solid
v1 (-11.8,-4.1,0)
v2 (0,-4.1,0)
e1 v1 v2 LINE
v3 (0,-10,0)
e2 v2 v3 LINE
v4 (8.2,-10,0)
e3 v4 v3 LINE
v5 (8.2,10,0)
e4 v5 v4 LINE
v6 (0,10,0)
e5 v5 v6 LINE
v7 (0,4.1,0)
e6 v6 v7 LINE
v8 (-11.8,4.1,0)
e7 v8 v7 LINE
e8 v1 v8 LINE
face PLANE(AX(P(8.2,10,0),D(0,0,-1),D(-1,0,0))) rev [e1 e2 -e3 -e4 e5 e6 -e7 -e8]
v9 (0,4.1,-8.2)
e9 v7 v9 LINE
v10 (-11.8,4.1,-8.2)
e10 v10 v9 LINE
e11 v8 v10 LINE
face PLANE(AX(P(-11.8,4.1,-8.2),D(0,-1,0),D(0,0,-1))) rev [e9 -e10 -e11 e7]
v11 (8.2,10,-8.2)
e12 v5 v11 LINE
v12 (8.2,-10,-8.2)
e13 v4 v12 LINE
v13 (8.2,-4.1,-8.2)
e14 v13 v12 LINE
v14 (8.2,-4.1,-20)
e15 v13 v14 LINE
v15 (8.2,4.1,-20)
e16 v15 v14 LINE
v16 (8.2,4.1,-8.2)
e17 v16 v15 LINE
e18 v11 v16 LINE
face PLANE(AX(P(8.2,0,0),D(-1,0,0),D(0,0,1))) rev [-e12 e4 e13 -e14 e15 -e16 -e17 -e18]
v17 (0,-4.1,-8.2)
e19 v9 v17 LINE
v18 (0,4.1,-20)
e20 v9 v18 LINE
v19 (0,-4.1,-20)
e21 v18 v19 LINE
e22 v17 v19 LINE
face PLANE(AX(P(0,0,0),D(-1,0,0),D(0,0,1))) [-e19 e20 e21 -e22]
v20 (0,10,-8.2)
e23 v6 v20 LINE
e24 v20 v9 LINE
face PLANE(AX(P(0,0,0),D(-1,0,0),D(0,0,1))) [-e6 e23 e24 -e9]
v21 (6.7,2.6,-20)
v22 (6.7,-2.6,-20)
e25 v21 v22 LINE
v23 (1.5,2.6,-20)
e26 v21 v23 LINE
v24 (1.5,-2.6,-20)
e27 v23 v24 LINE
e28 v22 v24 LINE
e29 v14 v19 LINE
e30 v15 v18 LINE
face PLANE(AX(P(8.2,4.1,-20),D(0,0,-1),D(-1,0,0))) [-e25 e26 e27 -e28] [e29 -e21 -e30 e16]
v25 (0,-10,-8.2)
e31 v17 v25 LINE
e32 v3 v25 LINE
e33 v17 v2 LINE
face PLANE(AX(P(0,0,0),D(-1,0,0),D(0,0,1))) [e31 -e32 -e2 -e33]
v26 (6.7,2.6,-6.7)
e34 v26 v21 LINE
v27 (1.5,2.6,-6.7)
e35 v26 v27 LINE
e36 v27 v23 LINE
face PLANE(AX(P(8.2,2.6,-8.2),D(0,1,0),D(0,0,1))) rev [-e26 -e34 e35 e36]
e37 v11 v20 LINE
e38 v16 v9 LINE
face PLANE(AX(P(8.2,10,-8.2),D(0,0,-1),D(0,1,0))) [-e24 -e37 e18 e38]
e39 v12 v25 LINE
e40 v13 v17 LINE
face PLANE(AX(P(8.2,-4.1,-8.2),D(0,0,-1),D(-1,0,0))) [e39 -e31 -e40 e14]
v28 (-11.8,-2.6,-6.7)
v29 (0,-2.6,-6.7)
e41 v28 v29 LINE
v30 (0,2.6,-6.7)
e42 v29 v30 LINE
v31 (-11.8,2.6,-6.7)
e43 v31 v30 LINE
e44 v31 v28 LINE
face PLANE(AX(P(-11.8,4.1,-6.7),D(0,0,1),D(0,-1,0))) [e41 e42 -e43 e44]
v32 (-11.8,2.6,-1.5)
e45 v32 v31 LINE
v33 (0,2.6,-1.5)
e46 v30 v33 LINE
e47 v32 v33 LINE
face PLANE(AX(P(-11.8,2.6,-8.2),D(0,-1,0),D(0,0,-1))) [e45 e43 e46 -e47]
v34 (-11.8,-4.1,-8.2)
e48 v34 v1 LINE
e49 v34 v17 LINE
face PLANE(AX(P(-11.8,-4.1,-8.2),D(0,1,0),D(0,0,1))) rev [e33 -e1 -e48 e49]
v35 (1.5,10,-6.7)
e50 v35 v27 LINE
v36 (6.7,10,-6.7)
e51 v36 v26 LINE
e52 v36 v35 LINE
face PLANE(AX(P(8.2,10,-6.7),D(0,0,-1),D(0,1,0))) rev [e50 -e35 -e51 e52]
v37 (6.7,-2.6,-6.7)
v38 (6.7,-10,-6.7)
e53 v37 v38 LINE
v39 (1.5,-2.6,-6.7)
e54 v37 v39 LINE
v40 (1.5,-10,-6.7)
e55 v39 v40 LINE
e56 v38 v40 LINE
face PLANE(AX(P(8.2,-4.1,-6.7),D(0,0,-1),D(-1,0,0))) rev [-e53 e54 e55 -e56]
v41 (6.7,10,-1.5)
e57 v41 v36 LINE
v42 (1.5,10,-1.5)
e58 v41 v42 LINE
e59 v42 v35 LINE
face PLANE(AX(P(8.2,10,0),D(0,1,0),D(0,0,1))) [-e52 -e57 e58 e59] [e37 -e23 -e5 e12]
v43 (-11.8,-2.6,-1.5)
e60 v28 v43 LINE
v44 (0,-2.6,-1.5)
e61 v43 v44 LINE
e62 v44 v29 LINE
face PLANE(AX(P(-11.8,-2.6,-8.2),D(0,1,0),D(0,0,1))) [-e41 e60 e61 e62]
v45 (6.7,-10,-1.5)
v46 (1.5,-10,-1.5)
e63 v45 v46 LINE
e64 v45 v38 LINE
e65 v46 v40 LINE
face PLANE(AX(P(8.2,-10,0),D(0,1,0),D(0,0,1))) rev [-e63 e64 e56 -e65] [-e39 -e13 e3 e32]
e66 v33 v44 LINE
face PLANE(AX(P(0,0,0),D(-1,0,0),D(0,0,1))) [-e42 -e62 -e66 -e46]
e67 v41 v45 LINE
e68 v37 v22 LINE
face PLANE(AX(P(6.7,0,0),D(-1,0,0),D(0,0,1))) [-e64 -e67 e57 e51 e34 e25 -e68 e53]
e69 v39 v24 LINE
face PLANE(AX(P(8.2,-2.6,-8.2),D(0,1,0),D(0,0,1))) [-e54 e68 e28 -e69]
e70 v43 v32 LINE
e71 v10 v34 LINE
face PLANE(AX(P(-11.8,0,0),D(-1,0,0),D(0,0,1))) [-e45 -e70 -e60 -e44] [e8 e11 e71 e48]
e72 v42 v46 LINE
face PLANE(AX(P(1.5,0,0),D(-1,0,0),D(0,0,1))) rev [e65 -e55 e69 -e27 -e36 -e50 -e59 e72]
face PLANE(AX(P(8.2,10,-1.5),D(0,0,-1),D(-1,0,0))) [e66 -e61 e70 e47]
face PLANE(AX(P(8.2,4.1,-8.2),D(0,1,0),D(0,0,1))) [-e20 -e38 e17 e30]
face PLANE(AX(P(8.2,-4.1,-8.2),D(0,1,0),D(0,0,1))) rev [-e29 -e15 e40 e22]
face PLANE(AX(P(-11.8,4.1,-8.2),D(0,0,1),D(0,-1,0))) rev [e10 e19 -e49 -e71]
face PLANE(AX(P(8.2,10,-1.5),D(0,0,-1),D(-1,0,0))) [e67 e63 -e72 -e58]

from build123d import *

# Parameters (mm, degrees)
BOSS_EXTRUDE1_DEPTH = 8.2
SHELL1_T            = -1.5
SKETCH2_W           = 8.2
SKETCH2_H           = 8.2
BOSS_EXTRUDE2_DEPTH = 11.8
SHELL2_START        = -11.8
SHELL2_OUTLINE_W    = 5.2
SHELL2_OUTLINE_H    = 5.2
SHELL2_DEPTH        = 11.8


# Read off the part's stored shape, not the designer's step: Shell2
with BuildPart() as part:
    # Sketch1 → Boss-Extrude1 (new body)
    with BuildSketch(Plane(origin=(0, 0, 0), x_dir=(0, 0, -1), z_dir=(1, 0, 0))):
        Polygon((0, 10), (0, -10), (8.2, -10), (8.2, -4.1), (20, -4.1), (20, 4.1), (8.2, 4.1), (8.2, 10), align=None)
    extrude(amount=BOSS_EXTRUDE1_DEPTH)

    # Shell1
    shell1_openings = [part.faces().sort_by_distance(p)[0] for p in [
        (4.1, -10, -4.1),
        (4.1, 10, -4.1),
        (4.1, 0, -20),
    ]]
    offset(amount=SHELL1_T, openings=shell1_openings, kind=Kind.INTERSECTION)

    # Sketch2 → Boss-Extrude2 (add)
    with BuildSketch(Plane.ZY):
        with Locations((-4.1, 0)):
            Rectangle(SKETCH2_W, SKETCH2_H)
    extrude(amount=BOSS_EXTRUDE2_DEPTH)

    # Shell2 outline → Shell2 (cut)
    with BuildSketch(Plane.YZ.offset(SHELL2_START)):
        with Locations((0, -4.1)):
            Rectangle(SHELL2_OUTLINE_W, SHELL2_OUTLINE_H)
    extrude(amount=SHELL2_DEPTH, mode=Mode.SUBTRACT)


solid = part.part
